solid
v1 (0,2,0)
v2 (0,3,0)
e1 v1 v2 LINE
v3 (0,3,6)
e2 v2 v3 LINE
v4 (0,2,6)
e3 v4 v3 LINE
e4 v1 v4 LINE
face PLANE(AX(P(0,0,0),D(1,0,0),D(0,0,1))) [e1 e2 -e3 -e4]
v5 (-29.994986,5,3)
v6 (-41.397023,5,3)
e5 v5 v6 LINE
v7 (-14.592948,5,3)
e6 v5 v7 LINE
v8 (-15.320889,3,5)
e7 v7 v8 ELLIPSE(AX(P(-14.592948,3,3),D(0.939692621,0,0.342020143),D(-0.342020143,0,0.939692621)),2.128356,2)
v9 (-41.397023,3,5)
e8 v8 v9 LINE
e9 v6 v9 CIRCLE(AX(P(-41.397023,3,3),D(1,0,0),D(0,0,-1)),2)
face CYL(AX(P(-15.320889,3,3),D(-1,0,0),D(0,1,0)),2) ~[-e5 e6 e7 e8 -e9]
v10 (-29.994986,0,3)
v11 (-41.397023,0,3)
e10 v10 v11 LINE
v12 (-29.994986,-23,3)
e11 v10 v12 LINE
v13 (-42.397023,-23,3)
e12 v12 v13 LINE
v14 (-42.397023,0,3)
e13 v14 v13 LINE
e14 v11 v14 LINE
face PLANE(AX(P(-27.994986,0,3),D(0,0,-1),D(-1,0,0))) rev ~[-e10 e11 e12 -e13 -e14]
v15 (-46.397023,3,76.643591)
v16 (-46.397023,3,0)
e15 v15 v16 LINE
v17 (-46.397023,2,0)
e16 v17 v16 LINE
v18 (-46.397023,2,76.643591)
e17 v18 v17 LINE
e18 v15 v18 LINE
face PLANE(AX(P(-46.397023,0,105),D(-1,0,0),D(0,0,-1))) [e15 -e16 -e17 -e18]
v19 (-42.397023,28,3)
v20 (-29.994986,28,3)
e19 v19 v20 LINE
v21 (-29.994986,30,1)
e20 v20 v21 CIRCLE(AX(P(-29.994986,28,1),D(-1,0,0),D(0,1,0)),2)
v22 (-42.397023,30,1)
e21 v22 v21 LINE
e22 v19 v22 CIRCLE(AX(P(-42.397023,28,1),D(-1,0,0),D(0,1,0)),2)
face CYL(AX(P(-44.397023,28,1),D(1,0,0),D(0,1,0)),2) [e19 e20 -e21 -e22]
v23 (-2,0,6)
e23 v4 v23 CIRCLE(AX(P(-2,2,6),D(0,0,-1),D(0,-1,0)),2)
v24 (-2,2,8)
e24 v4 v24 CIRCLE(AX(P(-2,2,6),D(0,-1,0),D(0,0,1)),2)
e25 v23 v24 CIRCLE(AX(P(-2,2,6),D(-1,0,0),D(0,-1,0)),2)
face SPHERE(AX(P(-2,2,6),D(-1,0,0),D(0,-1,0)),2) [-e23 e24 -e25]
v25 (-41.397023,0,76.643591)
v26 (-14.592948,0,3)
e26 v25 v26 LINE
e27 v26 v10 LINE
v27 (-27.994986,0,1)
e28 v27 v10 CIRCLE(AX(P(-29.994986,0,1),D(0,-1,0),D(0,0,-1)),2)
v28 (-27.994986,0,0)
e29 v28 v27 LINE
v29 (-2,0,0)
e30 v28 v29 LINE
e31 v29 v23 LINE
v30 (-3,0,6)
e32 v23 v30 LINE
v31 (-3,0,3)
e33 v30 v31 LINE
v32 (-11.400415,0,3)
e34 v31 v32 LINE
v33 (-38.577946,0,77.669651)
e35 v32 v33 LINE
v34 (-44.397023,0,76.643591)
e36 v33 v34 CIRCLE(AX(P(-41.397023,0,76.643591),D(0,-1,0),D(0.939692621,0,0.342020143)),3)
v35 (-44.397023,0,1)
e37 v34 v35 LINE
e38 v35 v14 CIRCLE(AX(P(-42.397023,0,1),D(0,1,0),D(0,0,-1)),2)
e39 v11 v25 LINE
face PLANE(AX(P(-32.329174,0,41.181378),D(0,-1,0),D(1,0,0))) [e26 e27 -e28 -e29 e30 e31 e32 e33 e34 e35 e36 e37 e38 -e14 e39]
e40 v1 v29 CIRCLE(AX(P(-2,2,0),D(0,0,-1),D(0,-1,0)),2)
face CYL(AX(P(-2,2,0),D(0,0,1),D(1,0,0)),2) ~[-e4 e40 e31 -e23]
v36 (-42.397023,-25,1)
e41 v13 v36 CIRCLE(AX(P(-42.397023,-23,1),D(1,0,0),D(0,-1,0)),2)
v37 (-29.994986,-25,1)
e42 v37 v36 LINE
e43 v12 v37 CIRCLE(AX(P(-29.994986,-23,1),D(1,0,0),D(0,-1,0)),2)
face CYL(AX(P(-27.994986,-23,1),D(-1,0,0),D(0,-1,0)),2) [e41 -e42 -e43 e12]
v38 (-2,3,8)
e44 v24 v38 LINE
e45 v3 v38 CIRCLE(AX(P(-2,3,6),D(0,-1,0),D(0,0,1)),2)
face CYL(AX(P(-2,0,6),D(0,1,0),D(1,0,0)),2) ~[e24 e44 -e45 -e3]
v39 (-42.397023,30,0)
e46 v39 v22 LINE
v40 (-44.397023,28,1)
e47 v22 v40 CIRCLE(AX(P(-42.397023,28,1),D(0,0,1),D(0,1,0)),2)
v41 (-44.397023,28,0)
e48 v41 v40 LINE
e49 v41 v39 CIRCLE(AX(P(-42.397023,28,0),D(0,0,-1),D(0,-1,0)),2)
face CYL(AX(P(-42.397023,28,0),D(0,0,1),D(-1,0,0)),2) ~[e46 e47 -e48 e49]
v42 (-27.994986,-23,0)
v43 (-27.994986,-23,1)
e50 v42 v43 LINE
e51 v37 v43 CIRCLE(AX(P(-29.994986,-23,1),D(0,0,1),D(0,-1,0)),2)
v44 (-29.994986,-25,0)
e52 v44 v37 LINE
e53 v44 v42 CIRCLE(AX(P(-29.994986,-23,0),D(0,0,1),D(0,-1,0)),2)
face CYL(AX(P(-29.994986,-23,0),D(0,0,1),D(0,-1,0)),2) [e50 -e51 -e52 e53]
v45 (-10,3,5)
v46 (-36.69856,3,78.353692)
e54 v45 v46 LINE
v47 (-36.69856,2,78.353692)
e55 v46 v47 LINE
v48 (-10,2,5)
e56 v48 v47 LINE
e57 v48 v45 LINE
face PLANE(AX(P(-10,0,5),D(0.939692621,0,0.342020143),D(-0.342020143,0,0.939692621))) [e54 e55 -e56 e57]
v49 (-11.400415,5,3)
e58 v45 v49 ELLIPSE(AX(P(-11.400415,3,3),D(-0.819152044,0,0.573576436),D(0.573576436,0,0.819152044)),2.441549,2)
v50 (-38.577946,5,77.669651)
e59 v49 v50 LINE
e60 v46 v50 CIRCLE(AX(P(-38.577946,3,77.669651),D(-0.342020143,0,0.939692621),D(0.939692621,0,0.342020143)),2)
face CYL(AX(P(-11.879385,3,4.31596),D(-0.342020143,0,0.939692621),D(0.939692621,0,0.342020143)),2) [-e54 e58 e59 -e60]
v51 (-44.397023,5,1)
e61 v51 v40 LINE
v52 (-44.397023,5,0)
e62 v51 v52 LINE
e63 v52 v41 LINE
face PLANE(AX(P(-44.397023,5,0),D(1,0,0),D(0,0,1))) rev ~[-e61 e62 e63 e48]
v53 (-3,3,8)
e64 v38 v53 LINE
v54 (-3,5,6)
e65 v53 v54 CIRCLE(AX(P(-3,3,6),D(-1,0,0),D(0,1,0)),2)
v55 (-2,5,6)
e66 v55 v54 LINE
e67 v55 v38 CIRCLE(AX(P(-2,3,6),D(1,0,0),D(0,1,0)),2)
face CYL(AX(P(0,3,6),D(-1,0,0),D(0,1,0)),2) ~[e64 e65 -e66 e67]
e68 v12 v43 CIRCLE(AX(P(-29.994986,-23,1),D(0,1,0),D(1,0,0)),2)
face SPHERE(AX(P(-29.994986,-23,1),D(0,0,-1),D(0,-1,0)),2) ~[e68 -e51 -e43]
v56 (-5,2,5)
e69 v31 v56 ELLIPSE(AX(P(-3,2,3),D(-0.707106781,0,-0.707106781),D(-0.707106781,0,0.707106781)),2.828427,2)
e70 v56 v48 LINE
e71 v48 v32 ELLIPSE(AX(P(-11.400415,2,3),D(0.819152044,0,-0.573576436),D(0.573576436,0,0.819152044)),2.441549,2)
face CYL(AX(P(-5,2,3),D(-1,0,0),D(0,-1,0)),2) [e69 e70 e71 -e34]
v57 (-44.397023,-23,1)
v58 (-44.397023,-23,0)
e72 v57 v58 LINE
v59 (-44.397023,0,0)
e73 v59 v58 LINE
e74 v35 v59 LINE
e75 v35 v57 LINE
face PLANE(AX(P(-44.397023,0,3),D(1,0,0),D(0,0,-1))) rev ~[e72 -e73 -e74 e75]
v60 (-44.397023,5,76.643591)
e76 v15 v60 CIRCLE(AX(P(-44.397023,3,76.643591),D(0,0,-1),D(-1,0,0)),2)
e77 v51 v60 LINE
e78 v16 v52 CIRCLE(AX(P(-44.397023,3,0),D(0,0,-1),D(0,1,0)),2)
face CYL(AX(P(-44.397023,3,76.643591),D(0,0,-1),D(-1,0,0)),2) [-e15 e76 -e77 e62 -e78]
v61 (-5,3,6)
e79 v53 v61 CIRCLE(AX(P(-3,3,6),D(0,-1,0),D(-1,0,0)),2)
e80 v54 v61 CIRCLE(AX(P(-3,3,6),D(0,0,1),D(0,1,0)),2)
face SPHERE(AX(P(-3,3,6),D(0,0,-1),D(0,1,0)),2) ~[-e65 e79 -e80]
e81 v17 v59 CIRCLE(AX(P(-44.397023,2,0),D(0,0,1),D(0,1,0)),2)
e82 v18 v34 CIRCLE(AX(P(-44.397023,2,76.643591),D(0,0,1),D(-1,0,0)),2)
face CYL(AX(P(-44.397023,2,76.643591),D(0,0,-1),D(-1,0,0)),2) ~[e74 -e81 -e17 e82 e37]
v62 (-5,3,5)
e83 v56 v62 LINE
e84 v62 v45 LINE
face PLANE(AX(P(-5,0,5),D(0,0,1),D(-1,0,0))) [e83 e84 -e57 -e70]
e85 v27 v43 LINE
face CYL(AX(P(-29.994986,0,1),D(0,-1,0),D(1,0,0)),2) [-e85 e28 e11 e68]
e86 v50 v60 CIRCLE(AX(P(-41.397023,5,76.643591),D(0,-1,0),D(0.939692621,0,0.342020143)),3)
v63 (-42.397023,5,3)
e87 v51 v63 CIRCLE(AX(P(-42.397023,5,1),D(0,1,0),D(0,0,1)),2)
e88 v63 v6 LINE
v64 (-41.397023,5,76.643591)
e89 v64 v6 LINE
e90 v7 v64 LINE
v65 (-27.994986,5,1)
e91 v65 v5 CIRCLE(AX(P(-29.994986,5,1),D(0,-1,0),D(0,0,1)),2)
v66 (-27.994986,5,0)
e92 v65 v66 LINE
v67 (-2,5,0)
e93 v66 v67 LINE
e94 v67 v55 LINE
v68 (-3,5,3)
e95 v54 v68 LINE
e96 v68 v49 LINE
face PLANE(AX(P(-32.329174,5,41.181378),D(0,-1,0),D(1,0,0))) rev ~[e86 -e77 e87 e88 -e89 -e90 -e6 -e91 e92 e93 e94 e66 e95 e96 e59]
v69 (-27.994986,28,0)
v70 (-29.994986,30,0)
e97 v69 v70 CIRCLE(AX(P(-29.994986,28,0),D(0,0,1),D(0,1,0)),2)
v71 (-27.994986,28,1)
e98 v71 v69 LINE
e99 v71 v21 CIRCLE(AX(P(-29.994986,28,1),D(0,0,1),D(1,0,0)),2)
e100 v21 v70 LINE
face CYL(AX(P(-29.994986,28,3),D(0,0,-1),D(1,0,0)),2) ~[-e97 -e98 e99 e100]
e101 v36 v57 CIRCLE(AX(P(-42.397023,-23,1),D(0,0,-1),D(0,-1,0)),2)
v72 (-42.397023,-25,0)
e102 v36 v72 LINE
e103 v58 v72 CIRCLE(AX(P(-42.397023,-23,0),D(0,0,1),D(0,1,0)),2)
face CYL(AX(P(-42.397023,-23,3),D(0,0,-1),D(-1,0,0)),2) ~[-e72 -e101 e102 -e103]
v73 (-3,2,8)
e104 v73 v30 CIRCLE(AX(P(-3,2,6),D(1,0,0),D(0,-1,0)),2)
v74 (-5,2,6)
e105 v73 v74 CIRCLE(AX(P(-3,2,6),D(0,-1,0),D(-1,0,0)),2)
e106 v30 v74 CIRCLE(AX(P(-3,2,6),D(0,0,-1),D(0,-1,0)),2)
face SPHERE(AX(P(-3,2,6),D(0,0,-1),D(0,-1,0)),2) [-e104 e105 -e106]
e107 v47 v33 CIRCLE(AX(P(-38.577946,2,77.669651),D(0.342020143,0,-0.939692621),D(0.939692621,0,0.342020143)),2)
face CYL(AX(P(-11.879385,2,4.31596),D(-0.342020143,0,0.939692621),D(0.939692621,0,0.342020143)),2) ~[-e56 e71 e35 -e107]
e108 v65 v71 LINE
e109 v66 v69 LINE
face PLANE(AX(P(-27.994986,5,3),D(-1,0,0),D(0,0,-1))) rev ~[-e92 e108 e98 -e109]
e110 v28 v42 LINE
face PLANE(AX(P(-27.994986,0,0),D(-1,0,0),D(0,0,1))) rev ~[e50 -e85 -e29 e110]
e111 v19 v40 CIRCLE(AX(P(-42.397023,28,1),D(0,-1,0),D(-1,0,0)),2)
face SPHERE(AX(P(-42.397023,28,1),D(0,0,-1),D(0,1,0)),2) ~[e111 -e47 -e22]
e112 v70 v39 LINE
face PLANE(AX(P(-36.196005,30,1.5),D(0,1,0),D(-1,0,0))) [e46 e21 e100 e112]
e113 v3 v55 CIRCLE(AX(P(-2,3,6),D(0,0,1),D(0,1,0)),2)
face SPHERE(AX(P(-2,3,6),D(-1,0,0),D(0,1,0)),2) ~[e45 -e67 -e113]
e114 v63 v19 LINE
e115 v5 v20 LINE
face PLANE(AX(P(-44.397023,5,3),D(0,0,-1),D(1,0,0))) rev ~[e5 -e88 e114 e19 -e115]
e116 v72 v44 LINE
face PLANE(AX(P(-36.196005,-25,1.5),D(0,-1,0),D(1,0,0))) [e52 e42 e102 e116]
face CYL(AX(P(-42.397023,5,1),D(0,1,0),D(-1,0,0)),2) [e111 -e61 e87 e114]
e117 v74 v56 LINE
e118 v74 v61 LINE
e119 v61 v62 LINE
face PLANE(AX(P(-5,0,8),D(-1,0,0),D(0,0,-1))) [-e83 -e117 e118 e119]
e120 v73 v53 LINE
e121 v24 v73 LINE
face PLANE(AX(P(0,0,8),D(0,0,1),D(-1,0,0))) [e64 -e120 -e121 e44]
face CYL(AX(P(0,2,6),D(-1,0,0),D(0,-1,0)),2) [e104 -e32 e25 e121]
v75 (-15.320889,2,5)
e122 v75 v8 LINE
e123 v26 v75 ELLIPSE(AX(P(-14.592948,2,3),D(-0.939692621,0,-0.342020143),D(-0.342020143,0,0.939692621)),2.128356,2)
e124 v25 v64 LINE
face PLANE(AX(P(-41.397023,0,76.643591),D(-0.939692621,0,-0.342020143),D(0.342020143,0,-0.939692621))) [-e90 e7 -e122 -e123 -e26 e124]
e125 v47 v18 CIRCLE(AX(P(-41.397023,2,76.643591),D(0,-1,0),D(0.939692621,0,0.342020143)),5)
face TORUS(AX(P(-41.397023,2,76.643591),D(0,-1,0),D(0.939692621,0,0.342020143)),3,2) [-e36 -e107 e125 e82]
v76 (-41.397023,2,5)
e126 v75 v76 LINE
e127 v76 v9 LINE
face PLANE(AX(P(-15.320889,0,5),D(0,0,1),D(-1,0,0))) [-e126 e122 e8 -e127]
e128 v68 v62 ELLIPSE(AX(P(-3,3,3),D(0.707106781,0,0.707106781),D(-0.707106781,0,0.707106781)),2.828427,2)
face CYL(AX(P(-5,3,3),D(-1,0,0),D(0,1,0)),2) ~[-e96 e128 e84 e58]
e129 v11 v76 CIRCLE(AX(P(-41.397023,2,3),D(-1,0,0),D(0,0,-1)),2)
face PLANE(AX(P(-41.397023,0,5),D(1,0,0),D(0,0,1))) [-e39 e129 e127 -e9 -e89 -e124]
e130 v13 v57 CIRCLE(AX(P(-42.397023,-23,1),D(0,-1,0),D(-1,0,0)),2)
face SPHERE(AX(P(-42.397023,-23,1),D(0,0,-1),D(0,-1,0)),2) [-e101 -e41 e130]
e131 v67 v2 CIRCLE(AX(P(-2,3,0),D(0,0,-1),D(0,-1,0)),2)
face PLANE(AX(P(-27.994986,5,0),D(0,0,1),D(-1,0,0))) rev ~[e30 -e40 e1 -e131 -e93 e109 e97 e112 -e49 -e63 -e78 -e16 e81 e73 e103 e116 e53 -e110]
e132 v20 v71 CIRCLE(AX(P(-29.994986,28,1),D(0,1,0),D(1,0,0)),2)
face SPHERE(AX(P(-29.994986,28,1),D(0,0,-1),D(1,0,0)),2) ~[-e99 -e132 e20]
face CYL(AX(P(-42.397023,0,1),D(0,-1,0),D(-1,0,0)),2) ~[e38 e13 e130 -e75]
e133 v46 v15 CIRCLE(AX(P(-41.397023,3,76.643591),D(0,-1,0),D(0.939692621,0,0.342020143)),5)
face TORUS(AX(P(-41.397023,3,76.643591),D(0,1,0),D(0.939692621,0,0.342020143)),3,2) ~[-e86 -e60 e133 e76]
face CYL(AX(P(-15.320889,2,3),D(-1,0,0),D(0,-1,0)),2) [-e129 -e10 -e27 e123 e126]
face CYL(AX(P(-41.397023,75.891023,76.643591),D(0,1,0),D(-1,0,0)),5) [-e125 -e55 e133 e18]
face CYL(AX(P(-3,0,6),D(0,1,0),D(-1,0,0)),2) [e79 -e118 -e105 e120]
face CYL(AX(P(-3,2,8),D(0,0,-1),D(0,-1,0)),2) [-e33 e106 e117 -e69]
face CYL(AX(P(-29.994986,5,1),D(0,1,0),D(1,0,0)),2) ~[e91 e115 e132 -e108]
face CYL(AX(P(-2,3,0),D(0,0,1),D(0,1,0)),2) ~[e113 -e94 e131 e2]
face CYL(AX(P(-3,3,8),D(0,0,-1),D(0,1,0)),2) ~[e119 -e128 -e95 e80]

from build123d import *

# Parameters (mm, degrees)
F1_DEPTH    = 5
F3_W        = 10
F3_H        = 180
F4_DEPTH    = 5.001
F5_T1_DEPTH = 146.7820454904
F6_R        = 2
F11_DEPTH   = 25
F13_DEPTH   = 25
F14_R       = 2


# Not quite as in the source:
# - a fillet or chamfer that OpenCascade refuses, or shapes differently, is made with other operations: its cross-section is extruded or revolved along the edge and cut away or added
# - two fillets or chamfers of one size are made in one step


with BuildPart() as f1:
    # F0 (on Front) → F1 (new body)
    with BuildSketch(Plane.XZ):
        Polygon((-46.3970234266, 0), (0, 0), (0, 8), (-5, 8), (-5, 5), (-10, 5), (-46.3970234266, 105), align=None)
        Polygon((-41.3970234266, 5), (-41.3970234266, 76.6435909019), (-15.3208888624, 5), align=None, mode=Mode.SUBTRACT)
    extrude(amount=-F1_DEPTH)

    # F3 (on face) → F4 (cut, through all)
    with BuildSketch(Plane.XY.offset(5)):
        with Locations((-5, 95)):
            Rectangle(F3_W, F3_H)
    extrude(amount=-F4_DEPTH, mode=Mode.SUBTRACT)

    # F5: fillet of radius 5 on 1 edges, made by hand

    # F5_s2 → F5_t1 (cut)
    with BuildSketch(Plane.XZ.offset(-75.8910227452)):
        with BuildLine():
            ThreePointArc((-46.3970234266, 76.6435909019), (-42.265264315, 81.567629667), (-36.6985603227, 78.3536916185))
            Line((-36.6985603227, 78.3536916185), (-46.3970234266, 105))
            Line((-46.3970234266, 105), (-46.3970234266, 76.6435909019))
        make_face()
    extrude(amount=F5_T1_DEPTH, mode=Mode.SUBTRACT)

    # F6
    f6_edges = [f1.edges().sort_by_distance(p)[0] for p in [
        (-46.397023, 0, 38.321795),
        (-46.397023, 5, 38.321795),
        (-42.265264, 0, 81.56763),
        (-23.34928, 0, 41.676846),
        (-7.5, 0, 5),
        (-5, 0, 6.5),
        (-2.5, 0, 8),
        (0, 0, 4),
        (-28.358956, 0, 5),
        (-7.5, 5, 5),
        (-5, 5, 6.5),
        (-2.5, 5, 8),
        (0, 5, 4),
        (-42.265264, 5, 81.56763),
        (-23.34928, 5, 41.676846),
        (-28.358956, 5, 5),
        (-5, 2.5, 8),
        (0, 2.5, 8),
    ]]
    fillet(f6_edges, radius=F6_R)

    # F10 (on face) → F11 (join)
    with BuildSketch(Plane.XZ):
        Polygon((-44.3970234266, 3), (-44.3970234266, 0), (-27.9949859102, 0), (-27.9949859102, 3), (-41.3970234266, 3), align=None)
    extrude(amount=F11_DEPTH)

    # F12 (on face) → F13 (join)
    with BuildSketch(Plane(origin=(0, 5, 0), x_dir=(-1, 0, 0), z_dir=(0, 1, 0))):
        Polygon((27.9949859102, 0), (44.3970234266, 0), (44.3970234266, 3), (41.3970234266, 3), (27.9949859102, 3), align=None)
    extrude(amount=F13_DEPTH)

    # F14
    f14_edges = [f1.edges().sort_by_distance(p)[0] for p in [
        (-27.994986, -25, 1.5),
        (-44.397023, -25, 1.5),
        (-36.196005, -25, 3),
        (-27.994986, -12.5, 3),
        (-44.397023, -12.5, 3),
        (-27.994986, 30, 1.5),
        (-44.397023, 30, 1.5),
        (-27.994986, 17.5, 3),
        (-36.196005, 30, 3),
        (-44.397023, 17.5, 3),
    ]]
    fillet(f14_edges, radius=F14_R)


solid = f1.part
